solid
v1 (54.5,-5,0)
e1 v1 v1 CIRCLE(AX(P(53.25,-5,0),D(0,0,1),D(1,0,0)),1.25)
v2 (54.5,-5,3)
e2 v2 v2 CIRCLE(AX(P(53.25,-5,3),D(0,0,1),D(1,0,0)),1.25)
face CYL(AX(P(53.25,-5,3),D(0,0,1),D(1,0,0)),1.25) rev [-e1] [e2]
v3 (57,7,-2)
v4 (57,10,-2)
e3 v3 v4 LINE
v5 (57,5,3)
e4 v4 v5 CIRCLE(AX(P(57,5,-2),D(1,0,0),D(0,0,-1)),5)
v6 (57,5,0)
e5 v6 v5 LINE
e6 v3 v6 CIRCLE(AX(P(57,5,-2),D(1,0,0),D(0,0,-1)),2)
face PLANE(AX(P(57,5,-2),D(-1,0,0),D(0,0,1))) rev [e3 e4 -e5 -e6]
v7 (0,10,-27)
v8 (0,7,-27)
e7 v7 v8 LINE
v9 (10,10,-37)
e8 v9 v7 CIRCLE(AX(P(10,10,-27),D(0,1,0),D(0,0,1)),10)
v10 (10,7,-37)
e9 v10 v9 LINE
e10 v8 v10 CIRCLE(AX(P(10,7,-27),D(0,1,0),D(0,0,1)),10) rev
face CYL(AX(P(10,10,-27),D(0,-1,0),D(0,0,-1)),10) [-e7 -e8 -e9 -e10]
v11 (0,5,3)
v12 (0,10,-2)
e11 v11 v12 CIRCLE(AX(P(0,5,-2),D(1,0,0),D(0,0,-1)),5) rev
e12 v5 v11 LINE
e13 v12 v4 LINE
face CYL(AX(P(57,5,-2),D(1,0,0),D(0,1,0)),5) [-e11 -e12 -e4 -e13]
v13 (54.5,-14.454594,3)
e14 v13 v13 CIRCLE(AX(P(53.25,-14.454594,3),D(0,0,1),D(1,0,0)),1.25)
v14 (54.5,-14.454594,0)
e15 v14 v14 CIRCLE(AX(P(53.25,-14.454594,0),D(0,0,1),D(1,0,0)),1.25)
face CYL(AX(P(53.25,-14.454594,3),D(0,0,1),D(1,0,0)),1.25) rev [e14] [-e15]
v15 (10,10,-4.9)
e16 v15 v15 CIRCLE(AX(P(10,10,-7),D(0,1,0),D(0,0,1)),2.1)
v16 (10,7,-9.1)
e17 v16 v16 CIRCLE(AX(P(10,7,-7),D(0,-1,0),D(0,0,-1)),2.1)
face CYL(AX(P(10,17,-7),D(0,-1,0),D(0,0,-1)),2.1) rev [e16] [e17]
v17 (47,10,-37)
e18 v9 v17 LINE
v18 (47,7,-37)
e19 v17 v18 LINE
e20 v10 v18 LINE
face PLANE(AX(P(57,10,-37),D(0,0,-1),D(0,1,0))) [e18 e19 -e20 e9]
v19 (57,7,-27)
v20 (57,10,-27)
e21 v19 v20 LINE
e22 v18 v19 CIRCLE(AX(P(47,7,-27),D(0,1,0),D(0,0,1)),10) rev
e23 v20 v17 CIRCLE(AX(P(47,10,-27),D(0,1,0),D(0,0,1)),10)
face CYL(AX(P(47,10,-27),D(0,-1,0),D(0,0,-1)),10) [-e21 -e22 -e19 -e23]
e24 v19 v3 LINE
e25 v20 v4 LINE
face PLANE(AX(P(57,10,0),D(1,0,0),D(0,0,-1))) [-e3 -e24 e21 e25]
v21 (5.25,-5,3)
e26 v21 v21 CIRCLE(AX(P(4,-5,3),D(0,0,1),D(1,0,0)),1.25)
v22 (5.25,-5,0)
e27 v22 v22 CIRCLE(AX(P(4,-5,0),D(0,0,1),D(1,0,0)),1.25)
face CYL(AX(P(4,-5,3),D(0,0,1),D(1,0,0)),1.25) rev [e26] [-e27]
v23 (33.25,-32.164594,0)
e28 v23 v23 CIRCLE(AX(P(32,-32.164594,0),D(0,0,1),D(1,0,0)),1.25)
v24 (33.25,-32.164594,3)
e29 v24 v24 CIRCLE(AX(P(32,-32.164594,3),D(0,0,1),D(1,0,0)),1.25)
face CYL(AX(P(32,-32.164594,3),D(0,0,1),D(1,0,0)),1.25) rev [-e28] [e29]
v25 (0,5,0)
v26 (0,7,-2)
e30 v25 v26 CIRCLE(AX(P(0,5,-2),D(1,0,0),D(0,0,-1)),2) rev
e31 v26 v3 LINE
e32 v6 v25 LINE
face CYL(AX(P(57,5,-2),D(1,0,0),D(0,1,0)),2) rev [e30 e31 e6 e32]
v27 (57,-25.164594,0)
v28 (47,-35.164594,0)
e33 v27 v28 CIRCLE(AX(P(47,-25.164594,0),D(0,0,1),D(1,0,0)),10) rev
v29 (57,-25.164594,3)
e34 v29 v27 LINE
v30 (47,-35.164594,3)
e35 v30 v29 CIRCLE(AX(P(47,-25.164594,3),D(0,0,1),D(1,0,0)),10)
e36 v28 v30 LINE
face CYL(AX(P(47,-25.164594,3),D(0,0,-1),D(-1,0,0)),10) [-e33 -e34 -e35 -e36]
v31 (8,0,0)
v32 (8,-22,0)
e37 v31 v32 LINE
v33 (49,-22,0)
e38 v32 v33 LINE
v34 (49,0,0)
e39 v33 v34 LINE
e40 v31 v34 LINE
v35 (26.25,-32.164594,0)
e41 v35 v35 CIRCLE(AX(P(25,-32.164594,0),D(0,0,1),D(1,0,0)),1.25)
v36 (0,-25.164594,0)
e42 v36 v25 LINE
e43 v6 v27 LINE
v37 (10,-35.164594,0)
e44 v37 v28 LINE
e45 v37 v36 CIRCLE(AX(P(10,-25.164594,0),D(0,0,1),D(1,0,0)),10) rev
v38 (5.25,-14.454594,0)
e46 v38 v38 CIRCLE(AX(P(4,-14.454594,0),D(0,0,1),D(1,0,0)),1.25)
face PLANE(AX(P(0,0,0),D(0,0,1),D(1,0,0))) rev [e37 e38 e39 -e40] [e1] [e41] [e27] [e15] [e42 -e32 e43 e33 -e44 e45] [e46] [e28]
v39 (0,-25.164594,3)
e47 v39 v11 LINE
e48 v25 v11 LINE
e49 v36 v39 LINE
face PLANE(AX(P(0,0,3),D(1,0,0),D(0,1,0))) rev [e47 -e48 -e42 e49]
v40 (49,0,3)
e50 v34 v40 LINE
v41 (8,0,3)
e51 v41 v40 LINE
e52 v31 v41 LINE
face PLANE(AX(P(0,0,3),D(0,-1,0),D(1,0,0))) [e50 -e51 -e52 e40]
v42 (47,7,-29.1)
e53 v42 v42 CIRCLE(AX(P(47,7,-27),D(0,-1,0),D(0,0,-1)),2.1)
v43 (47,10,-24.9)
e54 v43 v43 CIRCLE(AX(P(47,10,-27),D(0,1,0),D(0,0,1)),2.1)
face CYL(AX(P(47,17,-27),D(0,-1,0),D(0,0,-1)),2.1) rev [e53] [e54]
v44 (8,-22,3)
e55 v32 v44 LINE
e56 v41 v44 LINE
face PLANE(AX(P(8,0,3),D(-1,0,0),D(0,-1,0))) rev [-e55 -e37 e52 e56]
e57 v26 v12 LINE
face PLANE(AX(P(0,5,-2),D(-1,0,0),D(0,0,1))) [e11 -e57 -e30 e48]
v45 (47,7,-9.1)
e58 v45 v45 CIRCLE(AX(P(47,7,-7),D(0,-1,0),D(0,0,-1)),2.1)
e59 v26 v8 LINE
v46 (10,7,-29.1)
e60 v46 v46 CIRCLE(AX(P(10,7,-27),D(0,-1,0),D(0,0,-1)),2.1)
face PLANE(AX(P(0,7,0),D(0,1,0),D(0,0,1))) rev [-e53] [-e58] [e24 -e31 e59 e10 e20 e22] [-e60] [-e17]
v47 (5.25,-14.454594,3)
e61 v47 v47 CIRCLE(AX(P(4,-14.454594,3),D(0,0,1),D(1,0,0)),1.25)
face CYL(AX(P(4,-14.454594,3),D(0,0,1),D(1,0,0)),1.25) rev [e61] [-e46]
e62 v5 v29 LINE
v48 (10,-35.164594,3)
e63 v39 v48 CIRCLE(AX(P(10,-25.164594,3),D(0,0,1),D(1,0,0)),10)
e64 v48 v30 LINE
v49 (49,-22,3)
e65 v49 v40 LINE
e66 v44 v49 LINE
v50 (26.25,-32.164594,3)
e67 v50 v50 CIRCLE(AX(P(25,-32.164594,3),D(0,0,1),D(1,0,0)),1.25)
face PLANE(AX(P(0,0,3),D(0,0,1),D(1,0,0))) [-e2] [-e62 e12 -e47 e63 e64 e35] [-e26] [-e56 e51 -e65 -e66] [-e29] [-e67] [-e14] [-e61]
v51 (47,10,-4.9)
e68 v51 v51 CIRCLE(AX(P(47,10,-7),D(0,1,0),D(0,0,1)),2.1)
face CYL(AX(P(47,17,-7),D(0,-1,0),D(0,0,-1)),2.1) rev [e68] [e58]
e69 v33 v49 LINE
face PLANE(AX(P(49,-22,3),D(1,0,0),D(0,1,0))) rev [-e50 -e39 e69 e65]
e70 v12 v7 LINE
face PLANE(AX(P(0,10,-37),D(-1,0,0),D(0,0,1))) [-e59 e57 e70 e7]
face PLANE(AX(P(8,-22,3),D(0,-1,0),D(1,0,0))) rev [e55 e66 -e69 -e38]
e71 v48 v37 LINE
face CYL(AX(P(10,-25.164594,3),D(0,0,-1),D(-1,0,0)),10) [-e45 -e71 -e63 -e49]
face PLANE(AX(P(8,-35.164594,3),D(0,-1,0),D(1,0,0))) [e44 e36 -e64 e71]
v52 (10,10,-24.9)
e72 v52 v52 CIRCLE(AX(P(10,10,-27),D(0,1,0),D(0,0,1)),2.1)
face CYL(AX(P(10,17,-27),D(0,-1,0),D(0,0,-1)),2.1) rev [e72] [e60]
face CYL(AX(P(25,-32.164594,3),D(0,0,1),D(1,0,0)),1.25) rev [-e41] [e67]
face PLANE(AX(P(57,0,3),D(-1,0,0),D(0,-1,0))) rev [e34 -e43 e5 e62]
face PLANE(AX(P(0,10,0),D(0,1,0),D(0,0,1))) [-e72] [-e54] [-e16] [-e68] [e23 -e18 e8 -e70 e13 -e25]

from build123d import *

# Parameters (mm, degrees)
SKETCH_1_W                       = 57
SKETCH_1_H                       = 45.164593648
SKETCH_1_R                       = 1.25
EXTRUDE_1_DEPTH                  = 3
SM_EDGE_FLANGE_1_STRIP_W         = 16
SM_EDGE_FLANGE_1_STRIP_H         = 3
SM_EDGE_FLANGE_1_STRIP_CUT_DEPTH = 57
SM_EDGE_FLANGE_1_DEPTH           = 57
SKETCH_9_R                       = 2.1
CUT_EXTRUDE_1_DEPTH              = 10
FILLET_1_R                       = 10


# Sheet-metal steps are written as plain solids
with BuildPart() as part:
    # Sketch 1 → 填料-伸長1 (new body)
    with BuildSketch(Plane.XY):
        with Locations((28.5, -12.582296824)):
            Rectangle(SKETCH_1_W, SKETCH_1_H)
        Polygon((8, -22), (8, 0), (49, 0), (49, -14.454593648), (49, -22), align=None, mode=Mode.SUBTRACT)
        with Locations((25, -32.164593648)):
            Circle(SKETCH_1_R, mode=Mode.SUBTRACT)
        with Locations((4, -14.454593648)):
            Circle(SKETCH_1_R, mode=Mode.SUBTRACT)
        with Locations((32, -32.164593648)):
            Circle(SKETCH_1_R, mode=Mode.SUBTRACT)
        with Locations((53.25, -14.454593648)):
            Circle(SKETCH_1_R, mode=Mode.SUBTRACT)
        with Locations((4, -5)):
            Circle(SKETCH_1_R, mode=Mode.SUBTRACT)
        with Locations((53.25, -5)):
            Circle(SKETCH_1_R, mode=Mode.SUBTRACT)
    extrude(amount=EXTRUDE_1_DEPTH)

    # 邊線-凸緣1 strip (across the edge) → 邊線-凸緣1 strip cut (cut)
    with BuildSketch(Plane(origin=(0, 10, 0), x_dir=(0, -1, 0), z_dir=(1, 0, 0))):
        with Locations((-3, -1.5)):
            Rectangle(SM_EDGE_FLANGE_1_STRIP_W, SM_EDGE_FLANGE_1_STRIP_H)
    extrude(amount=SM_EDGE_FLANGE_1_STRIP_CUT_DEPTH, mode=Mode.SUBTRACT)

    # 邊線-凸緣1 section (across the edge) → 邊線-凸緣1 (add)
    with BuildSketch(Plane(origin=(0, 10, 0), x_dir=(0, -1, 0), z_dir=(1, 0, 0))):
        with BuildLine():
            Line((0, 2), (0, 37))
            Line((0, 37), (3, 37))
            Line((3, 37), (3, 2))
            ThreePointArc((3, 2), (3.585786438, 0.585786438), (5, 0))
            Line((5, 0), (5, -3))
            ThreePointArc((5, -3), (1.464466094, -1.535533906), (0, 2))
        make_face()
    extrude(amount=SM_EDGE_FLANGE_1_DEPTH)

    # 草圖9 → 除料-伸長1 (cut)
    with BuildSketch(Plane(origin=(0, 7, 0), x_dir=(-1, 0, 0), z_dir=(0, -1, 0))):
        with Locations(Location((-10, 27, 0), (0, 0, 90))):
            Circle(SKETCH_9_R)
        with Locations(Location((-47, 27, 0), (0, 0, 90))):
            Circle(SKETCH_9_R)
        with Locations(Location((-10, 7, 0), (0, 0, 90))):
            Circle(SKETCH_9_R)
        with Locations(Location((-47, 7, 0), (0, 0, 90))):
            Circle(SKETCH_9_R)
    extrude(amount=-CUT_EXTRUDE_1_DEPTH, mode=Mode.SUBTRACT)

    # 圓角1
    fillet_1_edges = [part.edges().sort_by_distance(p)[0] for p in [
        (57, -35.164593648, 1.5),
        (0, -35.164593648, 1.5),
        (0, 8.5, -37),
        (57, 8.5, -37),
    ]]
    fillet(fillet_1_edges, radius=FILLET_1_R)


solid = part.part
